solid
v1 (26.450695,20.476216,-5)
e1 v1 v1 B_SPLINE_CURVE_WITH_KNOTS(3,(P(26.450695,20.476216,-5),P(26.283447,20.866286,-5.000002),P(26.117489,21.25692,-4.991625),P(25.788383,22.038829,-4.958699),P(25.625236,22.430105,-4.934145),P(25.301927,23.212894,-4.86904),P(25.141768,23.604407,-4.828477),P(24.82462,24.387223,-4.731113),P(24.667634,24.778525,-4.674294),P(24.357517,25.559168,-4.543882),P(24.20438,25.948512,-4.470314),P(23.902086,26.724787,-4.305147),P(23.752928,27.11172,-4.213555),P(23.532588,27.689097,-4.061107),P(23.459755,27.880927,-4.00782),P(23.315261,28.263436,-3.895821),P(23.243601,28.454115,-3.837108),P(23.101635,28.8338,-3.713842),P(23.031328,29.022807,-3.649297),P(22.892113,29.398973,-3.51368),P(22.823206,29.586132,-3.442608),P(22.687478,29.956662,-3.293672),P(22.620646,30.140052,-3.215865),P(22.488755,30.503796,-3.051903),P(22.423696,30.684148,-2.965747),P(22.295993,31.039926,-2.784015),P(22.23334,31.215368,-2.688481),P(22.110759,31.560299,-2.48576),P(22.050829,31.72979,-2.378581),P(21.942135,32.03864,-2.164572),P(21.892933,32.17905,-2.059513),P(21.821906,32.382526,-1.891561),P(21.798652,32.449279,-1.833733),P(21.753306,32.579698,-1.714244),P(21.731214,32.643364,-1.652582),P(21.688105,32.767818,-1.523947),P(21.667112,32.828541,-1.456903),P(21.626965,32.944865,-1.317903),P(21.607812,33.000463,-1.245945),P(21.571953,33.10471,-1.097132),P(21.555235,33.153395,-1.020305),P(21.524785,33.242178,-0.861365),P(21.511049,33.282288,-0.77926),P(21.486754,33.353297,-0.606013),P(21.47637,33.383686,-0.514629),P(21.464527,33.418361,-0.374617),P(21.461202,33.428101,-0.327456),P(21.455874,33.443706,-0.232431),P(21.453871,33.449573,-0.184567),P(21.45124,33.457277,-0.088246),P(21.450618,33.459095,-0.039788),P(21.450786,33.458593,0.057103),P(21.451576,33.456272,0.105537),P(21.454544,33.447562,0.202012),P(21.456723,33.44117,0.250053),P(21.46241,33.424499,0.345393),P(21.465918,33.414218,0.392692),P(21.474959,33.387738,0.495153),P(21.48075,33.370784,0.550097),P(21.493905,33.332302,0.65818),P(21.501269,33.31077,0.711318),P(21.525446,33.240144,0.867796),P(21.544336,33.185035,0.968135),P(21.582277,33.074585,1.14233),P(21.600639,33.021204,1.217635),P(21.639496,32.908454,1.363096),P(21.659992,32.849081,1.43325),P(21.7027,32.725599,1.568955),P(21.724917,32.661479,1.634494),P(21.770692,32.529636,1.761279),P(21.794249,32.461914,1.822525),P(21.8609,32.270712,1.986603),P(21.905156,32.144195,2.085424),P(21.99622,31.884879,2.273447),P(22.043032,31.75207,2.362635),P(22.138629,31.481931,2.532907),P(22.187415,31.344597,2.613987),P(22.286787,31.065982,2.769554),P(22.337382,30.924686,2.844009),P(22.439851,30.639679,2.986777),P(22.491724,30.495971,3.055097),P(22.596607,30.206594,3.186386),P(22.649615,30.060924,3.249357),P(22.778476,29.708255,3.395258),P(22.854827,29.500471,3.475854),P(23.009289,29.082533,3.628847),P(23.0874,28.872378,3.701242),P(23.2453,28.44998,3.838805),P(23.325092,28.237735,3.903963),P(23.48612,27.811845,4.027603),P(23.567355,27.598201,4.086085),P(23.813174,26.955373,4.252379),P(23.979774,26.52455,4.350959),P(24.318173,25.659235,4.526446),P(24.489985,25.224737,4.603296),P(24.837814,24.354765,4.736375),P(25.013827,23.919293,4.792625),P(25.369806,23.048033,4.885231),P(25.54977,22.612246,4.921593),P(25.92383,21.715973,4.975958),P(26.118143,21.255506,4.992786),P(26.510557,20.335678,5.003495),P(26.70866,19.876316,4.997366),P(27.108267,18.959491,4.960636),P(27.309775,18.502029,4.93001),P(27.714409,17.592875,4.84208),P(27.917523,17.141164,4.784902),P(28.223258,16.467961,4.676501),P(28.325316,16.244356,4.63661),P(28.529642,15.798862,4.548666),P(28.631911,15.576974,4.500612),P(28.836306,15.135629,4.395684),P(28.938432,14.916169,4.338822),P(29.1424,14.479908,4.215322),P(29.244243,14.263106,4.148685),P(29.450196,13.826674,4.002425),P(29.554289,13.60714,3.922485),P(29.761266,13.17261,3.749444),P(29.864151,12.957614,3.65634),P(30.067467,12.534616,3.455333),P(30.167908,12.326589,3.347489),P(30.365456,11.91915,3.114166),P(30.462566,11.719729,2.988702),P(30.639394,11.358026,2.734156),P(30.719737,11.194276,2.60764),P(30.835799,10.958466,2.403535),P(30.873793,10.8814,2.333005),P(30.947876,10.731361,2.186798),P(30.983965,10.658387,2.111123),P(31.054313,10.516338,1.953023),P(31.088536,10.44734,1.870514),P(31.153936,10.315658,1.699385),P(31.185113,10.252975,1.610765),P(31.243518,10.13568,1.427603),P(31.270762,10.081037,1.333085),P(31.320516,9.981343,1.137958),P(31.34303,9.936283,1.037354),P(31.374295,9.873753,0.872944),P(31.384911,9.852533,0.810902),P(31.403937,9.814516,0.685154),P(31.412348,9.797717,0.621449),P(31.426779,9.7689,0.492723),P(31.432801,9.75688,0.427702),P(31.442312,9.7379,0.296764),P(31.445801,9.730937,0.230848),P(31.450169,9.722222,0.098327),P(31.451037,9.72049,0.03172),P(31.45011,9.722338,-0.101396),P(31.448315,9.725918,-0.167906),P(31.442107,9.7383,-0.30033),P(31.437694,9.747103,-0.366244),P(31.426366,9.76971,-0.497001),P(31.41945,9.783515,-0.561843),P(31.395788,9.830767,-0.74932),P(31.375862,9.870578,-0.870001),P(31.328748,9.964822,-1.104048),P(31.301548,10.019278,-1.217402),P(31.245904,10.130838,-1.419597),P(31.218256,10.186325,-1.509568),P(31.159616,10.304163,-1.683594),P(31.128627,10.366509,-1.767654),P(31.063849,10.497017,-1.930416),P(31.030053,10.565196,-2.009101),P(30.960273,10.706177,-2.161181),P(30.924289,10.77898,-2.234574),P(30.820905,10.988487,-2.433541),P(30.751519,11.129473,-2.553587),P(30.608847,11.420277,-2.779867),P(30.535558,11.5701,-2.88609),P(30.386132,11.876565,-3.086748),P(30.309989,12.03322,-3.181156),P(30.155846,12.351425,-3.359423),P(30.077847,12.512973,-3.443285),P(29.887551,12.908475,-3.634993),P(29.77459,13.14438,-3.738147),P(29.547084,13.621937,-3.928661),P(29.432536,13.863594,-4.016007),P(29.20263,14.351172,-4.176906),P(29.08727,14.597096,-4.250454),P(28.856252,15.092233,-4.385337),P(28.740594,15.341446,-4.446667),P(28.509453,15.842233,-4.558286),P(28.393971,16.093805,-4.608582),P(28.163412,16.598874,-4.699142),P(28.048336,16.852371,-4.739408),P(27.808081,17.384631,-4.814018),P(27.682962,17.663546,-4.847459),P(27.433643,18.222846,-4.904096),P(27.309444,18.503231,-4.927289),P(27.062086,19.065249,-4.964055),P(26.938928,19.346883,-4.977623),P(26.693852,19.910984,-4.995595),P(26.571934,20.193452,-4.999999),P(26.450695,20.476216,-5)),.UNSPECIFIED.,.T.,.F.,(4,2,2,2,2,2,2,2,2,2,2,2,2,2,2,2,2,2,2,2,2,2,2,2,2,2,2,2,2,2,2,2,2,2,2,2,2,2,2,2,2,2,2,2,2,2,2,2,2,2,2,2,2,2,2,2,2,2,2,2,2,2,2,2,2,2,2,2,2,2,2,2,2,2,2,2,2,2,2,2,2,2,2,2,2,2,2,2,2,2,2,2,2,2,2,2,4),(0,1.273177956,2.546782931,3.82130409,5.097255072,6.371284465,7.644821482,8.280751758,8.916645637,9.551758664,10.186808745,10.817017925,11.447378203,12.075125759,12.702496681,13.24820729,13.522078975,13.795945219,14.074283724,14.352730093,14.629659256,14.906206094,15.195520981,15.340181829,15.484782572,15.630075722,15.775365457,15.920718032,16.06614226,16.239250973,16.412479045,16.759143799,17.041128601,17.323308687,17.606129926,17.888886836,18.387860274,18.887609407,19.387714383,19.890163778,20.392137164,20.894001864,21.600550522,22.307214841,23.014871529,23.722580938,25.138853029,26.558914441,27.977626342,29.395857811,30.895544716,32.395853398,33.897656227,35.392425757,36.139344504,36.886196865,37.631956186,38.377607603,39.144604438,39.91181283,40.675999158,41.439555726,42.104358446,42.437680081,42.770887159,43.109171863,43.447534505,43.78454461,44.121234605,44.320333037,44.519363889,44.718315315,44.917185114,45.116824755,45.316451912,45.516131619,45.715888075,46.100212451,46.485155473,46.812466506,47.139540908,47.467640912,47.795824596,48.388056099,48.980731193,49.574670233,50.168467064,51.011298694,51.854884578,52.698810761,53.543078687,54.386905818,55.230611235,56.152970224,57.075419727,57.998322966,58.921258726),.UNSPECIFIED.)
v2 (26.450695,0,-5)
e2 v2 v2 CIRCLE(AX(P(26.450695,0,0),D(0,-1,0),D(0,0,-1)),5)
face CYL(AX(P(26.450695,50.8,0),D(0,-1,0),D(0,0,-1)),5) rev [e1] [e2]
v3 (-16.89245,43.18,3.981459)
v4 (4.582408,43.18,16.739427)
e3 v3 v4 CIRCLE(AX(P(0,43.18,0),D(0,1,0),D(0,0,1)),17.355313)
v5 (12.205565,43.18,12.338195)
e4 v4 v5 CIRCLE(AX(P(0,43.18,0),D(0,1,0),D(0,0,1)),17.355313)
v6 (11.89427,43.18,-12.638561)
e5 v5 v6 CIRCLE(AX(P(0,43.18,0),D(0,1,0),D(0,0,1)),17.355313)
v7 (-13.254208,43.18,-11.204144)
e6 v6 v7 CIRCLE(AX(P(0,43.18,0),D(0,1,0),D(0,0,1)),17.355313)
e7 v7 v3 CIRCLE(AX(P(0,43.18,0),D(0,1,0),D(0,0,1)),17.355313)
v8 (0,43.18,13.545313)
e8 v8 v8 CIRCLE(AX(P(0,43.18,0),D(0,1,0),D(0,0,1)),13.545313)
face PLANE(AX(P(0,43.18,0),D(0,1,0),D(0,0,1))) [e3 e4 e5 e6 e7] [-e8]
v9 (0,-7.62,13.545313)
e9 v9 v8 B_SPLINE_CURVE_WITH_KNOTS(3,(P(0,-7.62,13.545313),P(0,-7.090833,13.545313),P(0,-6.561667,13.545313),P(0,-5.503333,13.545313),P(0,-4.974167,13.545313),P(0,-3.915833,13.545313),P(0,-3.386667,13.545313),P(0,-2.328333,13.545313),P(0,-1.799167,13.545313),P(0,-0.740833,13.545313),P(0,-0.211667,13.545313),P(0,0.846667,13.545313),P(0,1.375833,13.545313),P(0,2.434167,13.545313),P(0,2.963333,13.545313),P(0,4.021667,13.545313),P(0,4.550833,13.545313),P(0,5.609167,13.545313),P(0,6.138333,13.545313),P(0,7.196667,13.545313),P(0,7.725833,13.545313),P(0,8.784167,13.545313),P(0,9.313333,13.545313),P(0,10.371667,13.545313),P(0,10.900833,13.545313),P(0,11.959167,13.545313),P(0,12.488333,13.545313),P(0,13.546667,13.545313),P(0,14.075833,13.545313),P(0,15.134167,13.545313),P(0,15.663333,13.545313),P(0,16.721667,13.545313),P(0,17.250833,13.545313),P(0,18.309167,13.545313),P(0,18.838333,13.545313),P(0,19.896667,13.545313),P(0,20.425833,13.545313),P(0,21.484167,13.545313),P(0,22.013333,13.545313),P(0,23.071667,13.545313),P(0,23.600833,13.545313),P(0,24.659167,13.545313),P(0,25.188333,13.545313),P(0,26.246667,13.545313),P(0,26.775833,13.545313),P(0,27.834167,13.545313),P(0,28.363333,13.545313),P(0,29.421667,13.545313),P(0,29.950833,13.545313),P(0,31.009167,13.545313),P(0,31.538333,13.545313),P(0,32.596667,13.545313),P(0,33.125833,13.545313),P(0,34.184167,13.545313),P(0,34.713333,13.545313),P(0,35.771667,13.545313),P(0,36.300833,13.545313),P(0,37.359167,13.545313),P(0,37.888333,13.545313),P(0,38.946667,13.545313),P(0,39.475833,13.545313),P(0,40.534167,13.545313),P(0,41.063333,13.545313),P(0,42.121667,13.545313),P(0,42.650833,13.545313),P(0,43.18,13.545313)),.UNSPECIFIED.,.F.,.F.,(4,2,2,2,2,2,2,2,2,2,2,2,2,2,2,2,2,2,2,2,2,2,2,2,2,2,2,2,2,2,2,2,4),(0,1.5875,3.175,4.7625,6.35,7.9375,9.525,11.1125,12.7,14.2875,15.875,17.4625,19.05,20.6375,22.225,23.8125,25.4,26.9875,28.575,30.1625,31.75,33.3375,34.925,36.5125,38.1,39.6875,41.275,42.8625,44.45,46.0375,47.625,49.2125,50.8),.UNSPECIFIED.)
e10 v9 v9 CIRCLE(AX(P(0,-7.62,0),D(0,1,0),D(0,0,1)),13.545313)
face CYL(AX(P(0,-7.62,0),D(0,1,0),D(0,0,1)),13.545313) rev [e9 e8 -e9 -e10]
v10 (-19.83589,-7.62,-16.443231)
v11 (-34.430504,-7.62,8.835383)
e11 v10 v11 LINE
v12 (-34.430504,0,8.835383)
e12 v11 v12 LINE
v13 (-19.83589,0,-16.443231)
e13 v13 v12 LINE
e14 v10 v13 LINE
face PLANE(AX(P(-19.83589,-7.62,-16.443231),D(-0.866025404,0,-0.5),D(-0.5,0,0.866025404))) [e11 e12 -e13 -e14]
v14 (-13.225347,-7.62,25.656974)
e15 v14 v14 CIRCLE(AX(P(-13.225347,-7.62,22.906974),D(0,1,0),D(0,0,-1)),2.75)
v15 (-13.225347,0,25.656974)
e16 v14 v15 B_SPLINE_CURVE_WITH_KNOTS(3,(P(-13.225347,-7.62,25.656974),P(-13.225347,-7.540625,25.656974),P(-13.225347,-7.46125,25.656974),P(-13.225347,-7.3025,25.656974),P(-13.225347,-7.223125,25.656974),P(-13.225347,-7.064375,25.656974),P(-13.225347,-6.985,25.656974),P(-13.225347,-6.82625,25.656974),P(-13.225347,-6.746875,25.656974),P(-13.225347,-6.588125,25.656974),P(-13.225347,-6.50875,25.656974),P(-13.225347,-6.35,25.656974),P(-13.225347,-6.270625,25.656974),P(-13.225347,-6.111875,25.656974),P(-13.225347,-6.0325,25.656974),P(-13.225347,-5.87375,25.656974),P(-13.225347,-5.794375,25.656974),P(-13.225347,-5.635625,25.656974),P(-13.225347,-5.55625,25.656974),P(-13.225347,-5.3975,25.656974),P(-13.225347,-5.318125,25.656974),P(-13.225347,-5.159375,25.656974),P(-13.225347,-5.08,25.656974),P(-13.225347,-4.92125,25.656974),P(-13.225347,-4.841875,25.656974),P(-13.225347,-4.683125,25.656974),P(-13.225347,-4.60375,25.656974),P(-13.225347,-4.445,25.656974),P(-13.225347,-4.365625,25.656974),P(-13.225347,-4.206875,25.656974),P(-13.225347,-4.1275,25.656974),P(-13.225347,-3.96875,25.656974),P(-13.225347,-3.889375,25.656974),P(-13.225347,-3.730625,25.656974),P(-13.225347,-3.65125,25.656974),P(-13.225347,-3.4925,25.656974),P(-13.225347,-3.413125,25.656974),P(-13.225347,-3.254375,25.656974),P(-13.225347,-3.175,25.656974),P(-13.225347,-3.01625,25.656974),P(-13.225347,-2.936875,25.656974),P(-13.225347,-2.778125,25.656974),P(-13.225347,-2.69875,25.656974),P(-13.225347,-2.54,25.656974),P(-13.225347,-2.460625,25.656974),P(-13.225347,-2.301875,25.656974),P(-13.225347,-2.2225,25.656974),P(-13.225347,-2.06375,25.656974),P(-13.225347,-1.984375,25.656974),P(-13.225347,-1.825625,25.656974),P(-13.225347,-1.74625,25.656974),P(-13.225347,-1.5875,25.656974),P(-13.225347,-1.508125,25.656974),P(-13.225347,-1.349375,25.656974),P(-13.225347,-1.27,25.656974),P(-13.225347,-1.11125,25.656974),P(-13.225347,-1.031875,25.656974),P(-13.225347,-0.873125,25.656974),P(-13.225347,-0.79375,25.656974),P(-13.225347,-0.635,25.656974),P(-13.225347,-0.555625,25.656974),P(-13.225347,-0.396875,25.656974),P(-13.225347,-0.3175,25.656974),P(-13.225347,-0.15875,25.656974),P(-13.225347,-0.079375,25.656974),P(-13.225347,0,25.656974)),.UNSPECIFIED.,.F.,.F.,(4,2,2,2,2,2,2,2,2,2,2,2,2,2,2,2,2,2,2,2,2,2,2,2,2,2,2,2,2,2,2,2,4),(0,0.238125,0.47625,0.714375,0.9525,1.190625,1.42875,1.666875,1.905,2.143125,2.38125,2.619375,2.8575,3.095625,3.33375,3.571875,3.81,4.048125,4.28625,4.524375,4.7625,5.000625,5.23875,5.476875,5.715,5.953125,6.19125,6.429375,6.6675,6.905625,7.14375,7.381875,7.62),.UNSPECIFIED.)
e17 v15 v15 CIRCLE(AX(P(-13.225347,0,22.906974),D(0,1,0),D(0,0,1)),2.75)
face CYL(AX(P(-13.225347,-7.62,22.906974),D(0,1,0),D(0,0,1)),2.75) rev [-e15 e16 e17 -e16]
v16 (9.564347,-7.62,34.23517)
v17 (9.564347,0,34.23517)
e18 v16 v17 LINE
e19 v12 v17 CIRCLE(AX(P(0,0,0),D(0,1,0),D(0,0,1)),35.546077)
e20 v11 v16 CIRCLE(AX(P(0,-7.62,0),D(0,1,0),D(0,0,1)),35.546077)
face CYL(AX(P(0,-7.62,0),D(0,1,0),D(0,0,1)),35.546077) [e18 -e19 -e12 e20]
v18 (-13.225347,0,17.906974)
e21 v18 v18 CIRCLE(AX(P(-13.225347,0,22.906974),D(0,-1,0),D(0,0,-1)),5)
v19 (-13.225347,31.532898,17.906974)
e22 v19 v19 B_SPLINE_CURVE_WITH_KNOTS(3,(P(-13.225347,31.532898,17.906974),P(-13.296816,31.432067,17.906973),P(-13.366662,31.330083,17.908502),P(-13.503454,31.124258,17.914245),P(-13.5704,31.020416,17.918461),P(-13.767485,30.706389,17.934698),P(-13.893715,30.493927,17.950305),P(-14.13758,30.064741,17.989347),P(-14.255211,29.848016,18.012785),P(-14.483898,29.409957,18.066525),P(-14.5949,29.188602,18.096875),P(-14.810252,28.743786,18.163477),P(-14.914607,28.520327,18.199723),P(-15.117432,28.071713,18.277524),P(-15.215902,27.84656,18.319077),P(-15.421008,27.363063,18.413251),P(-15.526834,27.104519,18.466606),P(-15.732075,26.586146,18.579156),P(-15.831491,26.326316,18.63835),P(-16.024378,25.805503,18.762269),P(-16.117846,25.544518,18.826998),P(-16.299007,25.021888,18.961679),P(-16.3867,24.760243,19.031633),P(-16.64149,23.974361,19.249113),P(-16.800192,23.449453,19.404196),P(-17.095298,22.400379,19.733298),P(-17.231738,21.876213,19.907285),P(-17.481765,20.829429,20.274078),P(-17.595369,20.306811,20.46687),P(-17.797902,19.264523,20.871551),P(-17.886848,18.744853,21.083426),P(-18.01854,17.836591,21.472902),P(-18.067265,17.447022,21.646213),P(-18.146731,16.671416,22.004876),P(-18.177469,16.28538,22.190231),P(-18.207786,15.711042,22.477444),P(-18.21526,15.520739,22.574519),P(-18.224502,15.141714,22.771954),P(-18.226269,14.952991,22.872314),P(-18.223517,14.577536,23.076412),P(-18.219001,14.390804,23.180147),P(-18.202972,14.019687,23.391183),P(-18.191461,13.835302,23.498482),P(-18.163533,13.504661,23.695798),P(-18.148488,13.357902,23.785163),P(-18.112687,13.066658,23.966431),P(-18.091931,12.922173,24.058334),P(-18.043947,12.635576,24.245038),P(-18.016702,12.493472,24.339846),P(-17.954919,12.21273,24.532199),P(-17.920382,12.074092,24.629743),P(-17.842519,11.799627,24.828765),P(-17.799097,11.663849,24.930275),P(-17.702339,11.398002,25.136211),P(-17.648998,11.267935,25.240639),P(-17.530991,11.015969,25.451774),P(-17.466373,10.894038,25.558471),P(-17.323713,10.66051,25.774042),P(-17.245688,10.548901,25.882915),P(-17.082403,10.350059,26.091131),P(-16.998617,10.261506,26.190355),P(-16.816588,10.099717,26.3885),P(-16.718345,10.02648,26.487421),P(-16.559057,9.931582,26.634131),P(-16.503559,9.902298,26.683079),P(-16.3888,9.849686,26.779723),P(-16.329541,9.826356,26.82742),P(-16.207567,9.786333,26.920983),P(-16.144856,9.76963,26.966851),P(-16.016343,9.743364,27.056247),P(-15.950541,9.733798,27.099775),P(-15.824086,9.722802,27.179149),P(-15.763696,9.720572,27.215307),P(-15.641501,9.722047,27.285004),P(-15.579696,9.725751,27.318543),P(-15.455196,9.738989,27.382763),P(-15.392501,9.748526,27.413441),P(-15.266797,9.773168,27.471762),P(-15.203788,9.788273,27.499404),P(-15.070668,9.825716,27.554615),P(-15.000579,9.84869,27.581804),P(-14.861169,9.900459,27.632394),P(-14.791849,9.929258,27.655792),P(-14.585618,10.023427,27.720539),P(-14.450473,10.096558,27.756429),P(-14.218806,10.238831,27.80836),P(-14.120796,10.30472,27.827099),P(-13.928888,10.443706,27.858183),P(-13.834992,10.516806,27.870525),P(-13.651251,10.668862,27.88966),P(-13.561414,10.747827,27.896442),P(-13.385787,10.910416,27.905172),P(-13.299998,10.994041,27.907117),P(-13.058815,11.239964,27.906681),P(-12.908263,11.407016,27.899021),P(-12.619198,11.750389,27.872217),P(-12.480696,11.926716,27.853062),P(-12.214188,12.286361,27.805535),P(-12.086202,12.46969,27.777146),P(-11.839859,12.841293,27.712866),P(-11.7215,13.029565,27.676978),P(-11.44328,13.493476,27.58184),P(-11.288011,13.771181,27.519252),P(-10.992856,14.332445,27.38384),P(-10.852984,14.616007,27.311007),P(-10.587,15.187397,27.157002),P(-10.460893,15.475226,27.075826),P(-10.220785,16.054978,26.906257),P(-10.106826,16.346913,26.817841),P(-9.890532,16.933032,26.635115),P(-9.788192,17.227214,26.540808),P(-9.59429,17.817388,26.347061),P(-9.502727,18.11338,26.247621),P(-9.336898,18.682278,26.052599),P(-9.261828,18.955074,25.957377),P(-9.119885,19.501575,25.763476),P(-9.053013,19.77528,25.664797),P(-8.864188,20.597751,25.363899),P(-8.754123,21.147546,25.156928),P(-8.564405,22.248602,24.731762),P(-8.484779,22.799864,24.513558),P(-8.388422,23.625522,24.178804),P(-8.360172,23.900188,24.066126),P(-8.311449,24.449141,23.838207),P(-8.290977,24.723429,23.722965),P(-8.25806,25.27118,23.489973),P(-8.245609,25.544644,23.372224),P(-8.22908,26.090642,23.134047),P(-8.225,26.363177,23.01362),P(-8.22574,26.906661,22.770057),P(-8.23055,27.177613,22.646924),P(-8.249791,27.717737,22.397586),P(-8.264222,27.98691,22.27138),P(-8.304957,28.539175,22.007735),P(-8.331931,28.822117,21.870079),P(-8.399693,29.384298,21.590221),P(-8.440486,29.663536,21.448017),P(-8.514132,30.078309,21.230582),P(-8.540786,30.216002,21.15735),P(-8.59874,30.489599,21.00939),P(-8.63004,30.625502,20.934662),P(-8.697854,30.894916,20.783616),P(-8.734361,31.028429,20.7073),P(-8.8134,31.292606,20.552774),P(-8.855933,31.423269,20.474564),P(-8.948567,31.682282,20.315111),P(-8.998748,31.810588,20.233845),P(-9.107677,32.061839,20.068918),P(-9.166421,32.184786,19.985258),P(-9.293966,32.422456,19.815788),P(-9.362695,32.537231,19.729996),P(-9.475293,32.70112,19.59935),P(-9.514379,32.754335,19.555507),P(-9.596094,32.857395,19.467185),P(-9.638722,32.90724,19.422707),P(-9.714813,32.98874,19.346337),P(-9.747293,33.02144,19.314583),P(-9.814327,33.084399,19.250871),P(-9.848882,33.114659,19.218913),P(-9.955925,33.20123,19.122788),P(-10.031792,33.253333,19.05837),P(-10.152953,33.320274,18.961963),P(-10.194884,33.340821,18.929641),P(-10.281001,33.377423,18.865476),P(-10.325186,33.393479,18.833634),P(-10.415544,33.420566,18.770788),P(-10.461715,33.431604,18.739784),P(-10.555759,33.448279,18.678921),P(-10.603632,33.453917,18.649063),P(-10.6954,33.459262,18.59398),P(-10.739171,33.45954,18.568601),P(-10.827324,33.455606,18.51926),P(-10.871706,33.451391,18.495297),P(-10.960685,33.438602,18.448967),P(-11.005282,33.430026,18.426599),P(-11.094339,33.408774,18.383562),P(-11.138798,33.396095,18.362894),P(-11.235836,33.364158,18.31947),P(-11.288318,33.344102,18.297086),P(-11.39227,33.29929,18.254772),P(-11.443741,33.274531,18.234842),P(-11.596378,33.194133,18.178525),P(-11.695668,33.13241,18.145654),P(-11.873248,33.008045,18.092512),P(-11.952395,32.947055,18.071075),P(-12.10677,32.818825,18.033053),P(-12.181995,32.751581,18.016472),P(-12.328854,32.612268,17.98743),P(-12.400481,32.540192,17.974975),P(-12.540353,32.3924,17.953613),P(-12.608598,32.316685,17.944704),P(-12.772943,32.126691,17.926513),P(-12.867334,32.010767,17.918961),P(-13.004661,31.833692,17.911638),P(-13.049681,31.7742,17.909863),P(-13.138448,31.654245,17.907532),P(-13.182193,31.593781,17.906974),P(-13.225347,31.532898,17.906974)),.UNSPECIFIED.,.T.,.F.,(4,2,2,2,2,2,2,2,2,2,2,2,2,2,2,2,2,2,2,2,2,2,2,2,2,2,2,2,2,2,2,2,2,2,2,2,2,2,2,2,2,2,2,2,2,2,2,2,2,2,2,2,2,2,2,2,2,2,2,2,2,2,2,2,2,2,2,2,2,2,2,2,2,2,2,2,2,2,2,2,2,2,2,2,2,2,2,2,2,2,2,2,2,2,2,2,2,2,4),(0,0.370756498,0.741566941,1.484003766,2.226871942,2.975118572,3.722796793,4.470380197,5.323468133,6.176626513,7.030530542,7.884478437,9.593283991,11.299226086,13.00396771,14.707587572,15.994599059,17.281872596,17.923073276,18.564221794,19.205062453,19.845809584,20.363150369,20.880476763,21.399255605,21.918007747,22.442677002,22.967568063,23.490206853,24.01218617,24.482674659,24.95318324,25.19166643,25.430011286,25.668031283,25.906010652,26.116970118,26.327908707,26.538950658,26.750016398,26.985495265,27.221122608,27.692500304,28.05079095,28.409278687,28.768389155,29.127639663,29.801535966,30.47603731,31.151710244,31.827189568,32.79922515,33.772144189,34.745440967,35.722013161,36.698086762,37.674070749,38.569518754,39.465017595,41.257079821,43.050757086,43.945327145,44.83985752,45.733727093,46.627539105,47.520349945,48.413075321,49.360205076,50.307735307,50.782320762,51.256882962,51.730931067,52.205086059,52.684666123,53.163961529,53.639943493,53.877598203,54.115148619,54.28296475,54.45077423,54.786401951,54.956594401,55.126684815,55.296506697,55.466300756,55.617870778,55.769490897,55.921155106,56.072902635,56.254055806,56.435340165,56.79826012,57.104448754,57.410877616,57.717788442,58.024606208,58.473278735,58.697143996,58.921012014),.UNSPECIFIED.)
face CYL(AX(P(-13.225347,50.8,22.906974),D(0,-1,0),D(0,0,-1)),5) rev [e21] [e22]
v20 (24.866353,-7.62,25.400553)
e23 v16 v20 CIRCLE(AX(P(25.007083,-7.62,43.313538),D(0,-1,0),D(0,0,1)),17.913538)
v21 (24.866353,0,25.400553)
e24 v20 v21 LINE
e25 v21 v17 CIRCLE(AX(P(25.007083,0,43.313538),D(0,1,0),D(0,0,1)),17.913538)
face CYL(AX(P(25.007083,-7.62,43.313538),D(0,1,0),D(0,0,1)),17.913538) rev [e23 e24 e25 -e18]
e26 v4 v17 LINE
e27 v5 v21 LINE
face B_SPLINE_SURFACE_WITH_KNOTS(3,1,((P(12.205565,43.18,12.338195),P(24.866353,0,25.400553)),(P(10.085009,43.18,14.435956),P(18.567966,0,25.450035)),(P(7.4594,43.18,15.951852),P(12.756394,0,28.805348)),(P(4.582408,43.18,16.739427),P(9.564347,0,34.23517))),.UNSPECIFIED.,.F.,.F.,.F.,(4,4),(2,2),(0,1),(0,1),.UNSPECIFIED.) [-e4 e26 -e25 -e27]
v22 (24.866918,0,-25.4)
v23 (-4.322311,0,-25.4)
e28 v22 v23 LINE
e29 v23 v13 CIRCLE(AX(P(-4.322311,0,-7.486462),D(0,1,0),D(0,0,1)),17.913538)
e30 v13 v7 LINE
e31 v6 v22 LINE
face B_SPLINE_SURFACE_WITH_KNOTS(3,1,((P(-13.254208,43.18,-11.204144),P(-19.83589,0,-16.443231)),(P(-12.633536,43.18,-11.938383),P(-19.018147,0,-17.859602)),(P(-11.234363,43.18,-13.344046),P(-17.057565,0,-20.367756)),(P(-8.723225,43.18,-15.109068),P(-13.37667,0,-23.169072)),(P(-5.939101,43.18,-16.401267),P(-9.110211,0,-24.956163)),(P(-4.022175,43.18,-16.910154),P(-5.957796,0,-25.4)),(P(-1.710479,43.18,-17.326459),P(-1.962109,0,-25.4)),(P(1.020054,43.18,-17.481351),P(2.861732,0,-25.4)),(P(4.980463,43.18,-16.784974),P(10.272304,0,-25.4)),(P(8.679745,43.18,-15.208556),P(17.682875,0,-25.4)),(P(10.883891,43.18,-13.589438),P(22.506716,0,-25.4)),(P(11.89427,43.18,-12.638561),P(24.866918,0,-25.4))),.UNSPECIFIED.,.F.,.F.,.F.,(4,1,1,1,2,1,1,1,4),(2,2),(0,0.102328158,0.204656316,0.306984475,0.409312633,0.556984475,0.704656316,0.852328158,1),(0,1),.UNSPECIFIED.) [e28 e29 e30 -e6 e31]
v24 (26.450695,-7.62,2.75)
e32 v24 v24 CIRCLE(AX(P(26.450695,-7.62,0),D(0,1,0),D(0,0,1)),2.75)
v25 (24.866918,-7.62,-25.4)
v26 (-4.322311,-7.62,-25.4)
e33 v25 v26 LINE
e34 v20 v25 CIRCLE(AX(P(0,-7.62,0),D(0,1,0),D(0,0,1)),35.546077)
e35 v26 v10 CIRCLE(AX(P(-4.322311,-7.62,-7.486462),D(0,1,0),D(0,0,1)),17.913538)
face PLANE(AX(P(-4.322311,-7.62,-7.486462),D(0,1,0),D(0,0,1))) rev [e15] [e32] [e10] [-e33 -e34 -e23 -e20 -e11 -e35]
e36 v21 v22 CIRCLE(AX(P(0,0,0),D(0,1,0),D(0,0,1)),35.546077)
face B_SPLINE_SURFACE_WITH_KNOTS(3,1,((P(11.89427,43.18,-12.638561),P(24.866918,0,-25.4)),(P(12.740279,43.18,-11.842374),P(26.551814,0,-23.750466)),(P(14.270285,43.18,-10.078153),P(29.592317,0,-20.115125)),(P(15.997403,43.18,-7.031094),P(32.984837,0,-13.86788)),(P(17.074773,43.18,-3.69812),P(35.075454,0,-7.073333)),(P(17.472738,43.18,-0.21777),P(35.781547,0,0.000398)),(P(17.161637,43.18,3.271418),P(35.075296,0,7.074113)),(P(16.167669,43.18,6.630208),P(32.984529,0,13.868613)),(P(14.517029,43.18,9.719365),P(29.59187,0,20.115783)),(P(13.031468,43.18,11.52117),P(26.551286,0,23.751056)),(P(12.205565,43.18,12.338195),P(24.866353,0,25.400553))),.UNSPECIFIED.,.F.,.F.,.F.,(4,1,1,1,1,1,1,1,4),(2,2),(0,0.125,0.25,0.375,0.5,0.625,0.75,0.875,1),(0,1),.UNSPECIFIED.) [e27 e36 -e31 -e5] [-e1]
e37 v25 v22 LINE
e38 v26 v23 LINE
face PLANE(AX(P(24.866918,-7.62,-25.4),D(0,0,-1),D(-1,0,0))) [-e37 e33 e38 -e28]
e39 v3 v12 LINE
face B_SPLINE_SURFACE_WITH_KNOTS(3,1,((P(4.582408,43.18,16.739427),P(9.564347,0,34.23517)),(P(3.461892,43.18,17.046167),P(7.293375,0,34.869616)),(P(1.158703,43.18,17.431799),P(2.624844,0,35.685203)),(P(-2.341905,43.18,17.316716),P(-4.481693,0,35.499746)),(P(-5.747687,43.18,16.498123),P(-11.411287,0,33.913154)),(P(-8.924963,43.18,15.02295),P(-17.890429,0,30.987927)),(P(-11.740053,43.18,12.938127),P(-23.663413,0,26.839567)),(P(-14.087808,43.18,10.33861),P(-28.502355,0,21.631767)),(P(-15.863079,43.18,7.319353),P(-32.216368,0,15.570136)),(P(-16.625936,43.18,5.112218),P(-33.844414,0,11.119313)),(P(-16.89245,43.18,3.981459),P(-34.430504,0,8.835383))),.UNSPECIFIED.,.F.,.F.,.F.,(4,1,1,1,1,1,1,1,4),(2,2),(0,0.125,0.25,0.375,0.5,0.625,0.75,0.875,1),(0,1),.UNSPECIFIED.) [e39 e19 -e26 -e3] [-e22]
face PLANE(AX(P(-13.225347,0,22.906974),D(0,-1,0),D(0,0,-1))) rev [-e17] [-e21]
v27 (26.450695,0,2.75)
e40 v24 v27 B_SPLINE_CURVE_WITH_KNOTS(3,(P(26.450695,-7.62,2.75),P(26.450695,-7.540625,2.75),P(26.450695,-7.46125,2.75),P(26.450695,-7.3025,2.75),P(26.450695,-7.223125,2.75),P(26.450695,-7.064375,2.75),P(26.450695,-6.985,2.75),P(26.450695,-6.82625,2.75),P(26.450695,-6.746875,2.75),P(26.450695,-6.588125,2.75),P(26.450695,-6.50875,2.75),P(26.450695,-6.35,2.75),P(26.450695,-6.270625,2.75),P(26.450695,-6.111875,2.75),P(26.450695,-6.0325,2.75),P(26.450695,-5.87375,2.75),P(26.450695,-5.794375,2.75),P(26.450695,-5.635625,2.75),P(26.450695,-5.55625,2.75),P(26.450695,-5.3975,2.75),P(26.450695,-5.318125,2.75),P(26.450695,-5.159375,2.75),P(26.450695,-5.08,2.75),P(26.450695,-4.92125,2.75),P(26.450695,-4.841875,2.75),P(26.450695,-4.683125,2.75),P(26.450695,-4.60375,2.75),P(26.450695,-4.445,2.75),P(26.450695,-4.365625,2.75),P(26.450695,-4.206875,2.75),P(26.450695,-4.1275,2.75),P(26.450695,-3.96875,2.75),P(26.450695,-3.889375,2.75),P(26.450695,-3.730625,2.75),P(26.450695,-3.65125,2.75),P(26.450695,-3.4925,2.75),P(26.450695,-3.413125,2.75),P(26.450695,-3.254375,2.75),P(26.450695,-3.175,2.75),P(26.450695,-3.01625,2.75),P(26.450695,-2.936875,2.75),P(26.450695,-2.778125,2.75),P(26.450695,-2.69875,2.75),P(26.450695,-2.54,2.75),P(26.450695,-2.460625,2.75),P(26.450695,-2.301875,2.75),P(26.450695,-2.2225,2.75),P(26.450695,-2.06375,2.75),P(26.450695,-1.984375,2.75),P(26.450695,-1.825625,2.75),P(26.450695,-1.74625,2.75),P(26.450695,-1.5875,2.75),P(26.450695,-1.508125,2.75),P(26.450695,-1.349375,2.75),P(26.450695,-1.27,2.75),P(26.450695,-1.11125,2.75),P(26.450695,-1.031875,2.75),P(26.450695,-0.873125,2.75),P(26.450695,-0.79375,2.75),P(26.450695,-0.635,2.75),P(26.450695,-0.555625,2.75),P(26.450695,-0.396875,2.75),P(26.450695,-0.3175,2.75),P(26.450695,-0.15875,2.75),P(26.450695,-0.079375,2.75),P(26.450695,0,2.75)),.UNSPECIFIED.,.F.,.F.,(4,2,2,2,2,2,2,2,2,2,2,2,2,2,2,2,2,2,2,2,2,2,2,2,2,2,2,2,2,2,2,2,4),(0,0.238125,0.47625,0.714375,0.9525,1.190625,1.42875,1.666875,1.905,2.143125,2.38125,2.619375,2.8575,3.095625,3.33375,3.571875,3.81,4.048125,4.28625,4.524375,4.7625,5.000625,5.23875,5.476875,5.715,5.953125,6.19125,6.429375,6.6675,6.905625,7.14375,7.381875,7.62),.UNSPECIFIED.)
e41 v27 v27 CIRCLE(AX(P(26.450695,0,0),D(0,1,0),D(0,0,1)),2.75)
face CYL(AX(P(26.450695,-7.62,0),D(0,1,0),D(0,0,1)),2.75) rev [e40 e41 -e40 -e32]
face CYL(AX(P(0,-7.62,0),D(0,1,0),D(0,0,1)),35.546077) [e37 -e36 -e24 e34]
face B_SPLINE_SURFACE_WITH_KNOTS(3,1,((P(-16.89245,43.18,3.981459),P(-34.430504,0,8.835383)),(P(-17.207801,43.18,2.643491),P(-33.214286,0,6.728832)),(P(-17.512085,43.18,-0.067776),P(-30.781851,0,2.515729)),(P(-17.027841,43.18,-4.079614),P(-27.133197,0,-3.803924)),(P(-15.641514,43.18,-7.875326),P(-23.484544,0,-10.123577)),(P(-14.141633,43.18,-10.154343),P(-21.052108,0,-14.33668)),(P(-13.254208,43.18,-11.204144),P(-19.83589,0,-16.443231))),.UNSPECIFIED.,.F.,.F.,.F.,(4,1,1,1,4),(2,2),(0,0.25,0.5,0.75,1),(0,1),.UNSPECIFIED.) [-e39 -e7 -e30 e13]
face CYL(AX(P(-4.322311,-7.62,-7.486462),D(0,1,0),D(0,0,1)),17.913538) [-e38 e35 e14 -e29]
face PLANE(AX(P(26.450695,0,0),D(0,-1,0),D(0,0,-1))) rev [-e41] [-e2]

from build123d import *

# Parameters (mm, degrees)
SKETCH1_7_R         = 13.545312508
SKETCH1_7_R_2       = 2.749999961
BOSS_EXTRUDE5_DEPTH = 7.62
SKETCH22_R          = 13.545312508
CUT_EXTRUDE5_DEPTH  = 50.8
CUT_EXTRUDE6_START  = -7.62
SKETCH25_R          = 5.000000033
CUT_EXTRUDE6_DEPTH  = 50.8


with BuildPart() as part:
    # Loft1: read off the stored shape, not the designer's step
    # Loft1: loft between two sections, ruled curve by curve
    loft1_from = [
        Edge.make_bspline([(-13.254208322, 43.18, -11.204143609), (-12.633535537, 43.18, -11.93838325), (-11.234363216, 43.18, -13.344046012), (-8.723224564, 43.18, -15.10906815), (-5.939101227, 43.18, -16.401266946), (-4.022175406, 43.18, -16.91015434), (-1.710478922, 43.18, -17.326458565), (1.020054434, 43.18, -17.481351312), (4.980463095, 43.18, -16.784974288), (8.679744685, 43.18, -15.208556373), (10.883890774, 43.18, -13.589438037), (11.894269516, 43.18, -12.638561031)], [0, 0, 0, 0, 0.102328158, 0.204656316, 0.306984475, 0.409312633, 0.409312633, 0.556984475, 0.704656316, 0.852328158, 1, 1, 1, 1], 3),
        Edge.make_bspline([(11.894269516, 43.18, -12.638561031), (12.740278673, 43.18, -11.842373798), (14.270284892, 43.18, -10.078152976), (15.997402516, 43.18, -7.03109441), (17.074773024, 43.18, -3.698120252), (17.472737525, 43.18, -0.21776962), (17.161637133, 43.18, 3.271418367), (16.167668723, 43.18, 6.630208439), (14.517029172, 43.18, 9.719365325), (13.03146774, 43.18, 11.521170356), (12.205564683, 43.18, 12.338195291)], [0, 0, 0, 0, 0.125, 0.25, 0.375, 0.5, 0.625, 0.75, 0.875, 1, 1, 1, 1], 3),
        Edge.make_bspline([(-16.892449678, 43.18, 3.981459045), (-17.207801412, 43.18, 2.643491419), (-17.512085455, 43.18, -0.067776302), (-17.027841122, 43.18, -4.079613908), (-15.641514271, 43.18, -7.875326148), (-14.141633278, 43.18, -10.154343138), (-13.254208322, 43.18, -11.204143609)], [0, 0, 0, 0, 0.25, 0.5, 0.75, 1, 1, 1, 1], 3),
        Edge.make_bspline([(12.205564683, 43.18, 12.338195291), (10.085008735, 43.18, 14.43595612), (7.459400361, 43.18, 15.951851822), (4.582408217, 43.18, 16.739426728)], [0, 0, 0, 0, 1, 1, 1, 1], 3),
        Edge.make_bspline([(4.582408217, 43.18, 16.739426728), (3.46189234, 43.18, 17.04616729), (1.158702694, 43.18, 17.431798713), (-2.341905421, 43.18, 17.316716053), (-5.747687154, 43.18, 16.498122911), (-8.924962786, 43.18, 15.02294976), (-11.740052597, 43.18, 12.938127076), (-14.087807634, 43.18, 10.338609768), (-15.863078946, 43.18, 7.319352748), (-16.625935887, 43.18, 5.112218083), (-16.892449678, 43.18, 3.981459045)], [0, 0, 0, 0, 0.125, 0.25, 0.375, 0.5, 0.625, 0.75, 0.875, 1, 1, 1, 1], 3),
    ]
    loft1_to = [
        Edge.make_bspline([(-19.835889966, 0, -16.443230766), (-19.018147421, 0, -17.859602401), (-17.057565089, 0, -20.367755884), (-13.376669909, 0, -23.169071918), (-9.110211469, 0, -24.956162636), (-5.957795671, 0, -25.4), (-1.962108839, 0, -25.4), (2.861731958, 0, -25.4), (10.272303676, 0, -25.4), (17.682875393, 0, -25.4), (22.50671619, 0, -25.4), (24.866917932, 0, -25.4)], [0, 0, 0, 0, 0.102328158, 0.204656316, 0.306984475, 0.409312633, 0.409312633, 0.556984475, 0.704656316, 0.852328158, 1, 1, 1, 1], 3),
        Edge.make_bspline([(24.866917932, 0, -25.4), (26.551814028, 0, -23.750465632), (29.592317297, 0, -20.115125381), (32.984836959, 0, -13.867879688), (35.075453527, 0, -7.073333096), (35.781546505, 0, 0.000397722), (35.075296274, 0, 7.074112842), (32.98452866, 0, 13.868612957), (29.591870119, 0, 20.11578323), (26.551286035, 0, 23.751055888), (24.866353269, 0, 25.400552799)], [0, 0, 0, 0, 0.125, 0.25, 0.375, 0.5, 0.625, 0.75, 0.875, 1, 1, 1, 1], 3),
        Edge.make_bspline([(-34.430504222, 0, 8.835382643), (-33.214286367, 0, 6.728831526), (-30.781850658, 0, 2.515729291), (-27.133197094, 0, -3.803924062), (-23.48454353, 0, -10.123577414), (-21.05210782, 0, -14.336679649), (-19.835889966, 0, -16.443230766)], [0, 0, 0, 0, 0.25, 0.5, 0.75, 1, 1, 1, 1], 3),
        Edge.make_bspline([(24.866353269, 0, 25.400552799), (18.567965834, 0, 25.450034833), (12.756393776, 0, 28.805347525), (9.56434736, 0, 34.23517003)], [0, 0, 0, 0, 1, 1, 1, 1], 3),
        Edge.make_bspline([(9.56434736, 0, 34.23517003), (7.293374748, 0, 34.869616154), (2.624844235, 0, 35.685202884), (-4.481693194, 0, 35.49974623), (-11.411286707, 0, 33.91315404), (-17.890428815, 0, 30.987927121), (-23.663412914, 0, 26.839567256), (-28.502354586, 0, 21.631766902), (-32.216368229, 0, 15.570135845), (-33.844413603, 0, 11.119312649), (-34.430504222, 0, 8.835382643)], [0, 0, 0, 0, 0.125, 0.25, 0.375, 0.5, 0.625, 0.75, 0.875, 1, 1, 1, 1], 3),
    ]
    loft1 = Solid(Shell([*[Face.make_surface_from_curves(loft1_from[k], loft1_to[k]) for k in range(5)], Face(Wire(loft1_from)), Face(Wire(loft1_to))]))
    add(loft1)

    # Sketch1<7> → Boss-Extrude5 (add)
    with BuildSketch(Plane(origin=(0, 0, 0), x_dir=(1, 0, 0), z_dir=(0, 1, 0))):
        with BuildLine():
            Line((24.866917932, 25.4), (-4.322310581, 25.4))
            ThreePointArc((-4.322310581, 25.4), (-13.279079815, 23.000040917), (-19.835889966, 16.443230766))
            Line((-19.835889966, 16.443230766), (-34.430504222, -8.835382643))
            ThreePointArc((-34.430504222, -8.835382643), (-17.77269645, -30.784003449), (9.56434736, -34.23517003))
            ThreePointArc((9.56434736, -34.23517003), (16.05031386, -27.799959083), (24.866353269, -25.400552799))
            ThreePointArc((24.866353269, -25.400552799), (35.546077242, -0.000395105), (24.866917932, 25.4))
        make_face()
        with Locations(Location((0, 0, 0), (0, 0, 270))):
            Circle(SKETCH1_7_R, mode=Mode.SUBTRACT)
        with Locations(Location((26.450694876, 0, 0), (0, 0, 270))):
            Circle(SKETCH1_7_R_2, mode=Mode.SUBTRACT)
        with Locations(Location((-13.225347438, -22.90697371, 0), (0, 0, 270))):
            Circle(SKETCH1_7_R_2, mode=Mode.SUBTRACT)
    extrude(amount=-BOSS_EXTRUDE5_DEPTH)

    # Sketch22 → Cut-Extrude5 (cut)
    with BuildSketch(Plane(origin=(0, 43.18, 0), x_dir=(1, 0, 0), z_dir=(0, 1, 0))):
        with Locations(Location((0, 0, 0), (0, 0, 270))):
            Circle(SKETCH22_R)
    extrude(amount=-CUT_EXTRUDE5_DEPTH, mode=Mode.SUBTRACT)

    # Sketch25 → Cut-Extrude6 (cut)
    with BuildSketch(Plane.XZ.offset(7.62).offset(CUT_EXTRUDE6_START)):
        with Locations(Location((-13.225347438, 22.90697371, 0), (0, 0, 270))):
            Circle(SKETCH25_R)
        with Locations(Location((26.450694876, 0, 0), (0, 0, 270))):
            Circle(SKETCH25_R)
    extrude(amount=-CUT_EXTRUDE6_DEPTH, mode=Mode.SUBTRACT)


solid = part.part
